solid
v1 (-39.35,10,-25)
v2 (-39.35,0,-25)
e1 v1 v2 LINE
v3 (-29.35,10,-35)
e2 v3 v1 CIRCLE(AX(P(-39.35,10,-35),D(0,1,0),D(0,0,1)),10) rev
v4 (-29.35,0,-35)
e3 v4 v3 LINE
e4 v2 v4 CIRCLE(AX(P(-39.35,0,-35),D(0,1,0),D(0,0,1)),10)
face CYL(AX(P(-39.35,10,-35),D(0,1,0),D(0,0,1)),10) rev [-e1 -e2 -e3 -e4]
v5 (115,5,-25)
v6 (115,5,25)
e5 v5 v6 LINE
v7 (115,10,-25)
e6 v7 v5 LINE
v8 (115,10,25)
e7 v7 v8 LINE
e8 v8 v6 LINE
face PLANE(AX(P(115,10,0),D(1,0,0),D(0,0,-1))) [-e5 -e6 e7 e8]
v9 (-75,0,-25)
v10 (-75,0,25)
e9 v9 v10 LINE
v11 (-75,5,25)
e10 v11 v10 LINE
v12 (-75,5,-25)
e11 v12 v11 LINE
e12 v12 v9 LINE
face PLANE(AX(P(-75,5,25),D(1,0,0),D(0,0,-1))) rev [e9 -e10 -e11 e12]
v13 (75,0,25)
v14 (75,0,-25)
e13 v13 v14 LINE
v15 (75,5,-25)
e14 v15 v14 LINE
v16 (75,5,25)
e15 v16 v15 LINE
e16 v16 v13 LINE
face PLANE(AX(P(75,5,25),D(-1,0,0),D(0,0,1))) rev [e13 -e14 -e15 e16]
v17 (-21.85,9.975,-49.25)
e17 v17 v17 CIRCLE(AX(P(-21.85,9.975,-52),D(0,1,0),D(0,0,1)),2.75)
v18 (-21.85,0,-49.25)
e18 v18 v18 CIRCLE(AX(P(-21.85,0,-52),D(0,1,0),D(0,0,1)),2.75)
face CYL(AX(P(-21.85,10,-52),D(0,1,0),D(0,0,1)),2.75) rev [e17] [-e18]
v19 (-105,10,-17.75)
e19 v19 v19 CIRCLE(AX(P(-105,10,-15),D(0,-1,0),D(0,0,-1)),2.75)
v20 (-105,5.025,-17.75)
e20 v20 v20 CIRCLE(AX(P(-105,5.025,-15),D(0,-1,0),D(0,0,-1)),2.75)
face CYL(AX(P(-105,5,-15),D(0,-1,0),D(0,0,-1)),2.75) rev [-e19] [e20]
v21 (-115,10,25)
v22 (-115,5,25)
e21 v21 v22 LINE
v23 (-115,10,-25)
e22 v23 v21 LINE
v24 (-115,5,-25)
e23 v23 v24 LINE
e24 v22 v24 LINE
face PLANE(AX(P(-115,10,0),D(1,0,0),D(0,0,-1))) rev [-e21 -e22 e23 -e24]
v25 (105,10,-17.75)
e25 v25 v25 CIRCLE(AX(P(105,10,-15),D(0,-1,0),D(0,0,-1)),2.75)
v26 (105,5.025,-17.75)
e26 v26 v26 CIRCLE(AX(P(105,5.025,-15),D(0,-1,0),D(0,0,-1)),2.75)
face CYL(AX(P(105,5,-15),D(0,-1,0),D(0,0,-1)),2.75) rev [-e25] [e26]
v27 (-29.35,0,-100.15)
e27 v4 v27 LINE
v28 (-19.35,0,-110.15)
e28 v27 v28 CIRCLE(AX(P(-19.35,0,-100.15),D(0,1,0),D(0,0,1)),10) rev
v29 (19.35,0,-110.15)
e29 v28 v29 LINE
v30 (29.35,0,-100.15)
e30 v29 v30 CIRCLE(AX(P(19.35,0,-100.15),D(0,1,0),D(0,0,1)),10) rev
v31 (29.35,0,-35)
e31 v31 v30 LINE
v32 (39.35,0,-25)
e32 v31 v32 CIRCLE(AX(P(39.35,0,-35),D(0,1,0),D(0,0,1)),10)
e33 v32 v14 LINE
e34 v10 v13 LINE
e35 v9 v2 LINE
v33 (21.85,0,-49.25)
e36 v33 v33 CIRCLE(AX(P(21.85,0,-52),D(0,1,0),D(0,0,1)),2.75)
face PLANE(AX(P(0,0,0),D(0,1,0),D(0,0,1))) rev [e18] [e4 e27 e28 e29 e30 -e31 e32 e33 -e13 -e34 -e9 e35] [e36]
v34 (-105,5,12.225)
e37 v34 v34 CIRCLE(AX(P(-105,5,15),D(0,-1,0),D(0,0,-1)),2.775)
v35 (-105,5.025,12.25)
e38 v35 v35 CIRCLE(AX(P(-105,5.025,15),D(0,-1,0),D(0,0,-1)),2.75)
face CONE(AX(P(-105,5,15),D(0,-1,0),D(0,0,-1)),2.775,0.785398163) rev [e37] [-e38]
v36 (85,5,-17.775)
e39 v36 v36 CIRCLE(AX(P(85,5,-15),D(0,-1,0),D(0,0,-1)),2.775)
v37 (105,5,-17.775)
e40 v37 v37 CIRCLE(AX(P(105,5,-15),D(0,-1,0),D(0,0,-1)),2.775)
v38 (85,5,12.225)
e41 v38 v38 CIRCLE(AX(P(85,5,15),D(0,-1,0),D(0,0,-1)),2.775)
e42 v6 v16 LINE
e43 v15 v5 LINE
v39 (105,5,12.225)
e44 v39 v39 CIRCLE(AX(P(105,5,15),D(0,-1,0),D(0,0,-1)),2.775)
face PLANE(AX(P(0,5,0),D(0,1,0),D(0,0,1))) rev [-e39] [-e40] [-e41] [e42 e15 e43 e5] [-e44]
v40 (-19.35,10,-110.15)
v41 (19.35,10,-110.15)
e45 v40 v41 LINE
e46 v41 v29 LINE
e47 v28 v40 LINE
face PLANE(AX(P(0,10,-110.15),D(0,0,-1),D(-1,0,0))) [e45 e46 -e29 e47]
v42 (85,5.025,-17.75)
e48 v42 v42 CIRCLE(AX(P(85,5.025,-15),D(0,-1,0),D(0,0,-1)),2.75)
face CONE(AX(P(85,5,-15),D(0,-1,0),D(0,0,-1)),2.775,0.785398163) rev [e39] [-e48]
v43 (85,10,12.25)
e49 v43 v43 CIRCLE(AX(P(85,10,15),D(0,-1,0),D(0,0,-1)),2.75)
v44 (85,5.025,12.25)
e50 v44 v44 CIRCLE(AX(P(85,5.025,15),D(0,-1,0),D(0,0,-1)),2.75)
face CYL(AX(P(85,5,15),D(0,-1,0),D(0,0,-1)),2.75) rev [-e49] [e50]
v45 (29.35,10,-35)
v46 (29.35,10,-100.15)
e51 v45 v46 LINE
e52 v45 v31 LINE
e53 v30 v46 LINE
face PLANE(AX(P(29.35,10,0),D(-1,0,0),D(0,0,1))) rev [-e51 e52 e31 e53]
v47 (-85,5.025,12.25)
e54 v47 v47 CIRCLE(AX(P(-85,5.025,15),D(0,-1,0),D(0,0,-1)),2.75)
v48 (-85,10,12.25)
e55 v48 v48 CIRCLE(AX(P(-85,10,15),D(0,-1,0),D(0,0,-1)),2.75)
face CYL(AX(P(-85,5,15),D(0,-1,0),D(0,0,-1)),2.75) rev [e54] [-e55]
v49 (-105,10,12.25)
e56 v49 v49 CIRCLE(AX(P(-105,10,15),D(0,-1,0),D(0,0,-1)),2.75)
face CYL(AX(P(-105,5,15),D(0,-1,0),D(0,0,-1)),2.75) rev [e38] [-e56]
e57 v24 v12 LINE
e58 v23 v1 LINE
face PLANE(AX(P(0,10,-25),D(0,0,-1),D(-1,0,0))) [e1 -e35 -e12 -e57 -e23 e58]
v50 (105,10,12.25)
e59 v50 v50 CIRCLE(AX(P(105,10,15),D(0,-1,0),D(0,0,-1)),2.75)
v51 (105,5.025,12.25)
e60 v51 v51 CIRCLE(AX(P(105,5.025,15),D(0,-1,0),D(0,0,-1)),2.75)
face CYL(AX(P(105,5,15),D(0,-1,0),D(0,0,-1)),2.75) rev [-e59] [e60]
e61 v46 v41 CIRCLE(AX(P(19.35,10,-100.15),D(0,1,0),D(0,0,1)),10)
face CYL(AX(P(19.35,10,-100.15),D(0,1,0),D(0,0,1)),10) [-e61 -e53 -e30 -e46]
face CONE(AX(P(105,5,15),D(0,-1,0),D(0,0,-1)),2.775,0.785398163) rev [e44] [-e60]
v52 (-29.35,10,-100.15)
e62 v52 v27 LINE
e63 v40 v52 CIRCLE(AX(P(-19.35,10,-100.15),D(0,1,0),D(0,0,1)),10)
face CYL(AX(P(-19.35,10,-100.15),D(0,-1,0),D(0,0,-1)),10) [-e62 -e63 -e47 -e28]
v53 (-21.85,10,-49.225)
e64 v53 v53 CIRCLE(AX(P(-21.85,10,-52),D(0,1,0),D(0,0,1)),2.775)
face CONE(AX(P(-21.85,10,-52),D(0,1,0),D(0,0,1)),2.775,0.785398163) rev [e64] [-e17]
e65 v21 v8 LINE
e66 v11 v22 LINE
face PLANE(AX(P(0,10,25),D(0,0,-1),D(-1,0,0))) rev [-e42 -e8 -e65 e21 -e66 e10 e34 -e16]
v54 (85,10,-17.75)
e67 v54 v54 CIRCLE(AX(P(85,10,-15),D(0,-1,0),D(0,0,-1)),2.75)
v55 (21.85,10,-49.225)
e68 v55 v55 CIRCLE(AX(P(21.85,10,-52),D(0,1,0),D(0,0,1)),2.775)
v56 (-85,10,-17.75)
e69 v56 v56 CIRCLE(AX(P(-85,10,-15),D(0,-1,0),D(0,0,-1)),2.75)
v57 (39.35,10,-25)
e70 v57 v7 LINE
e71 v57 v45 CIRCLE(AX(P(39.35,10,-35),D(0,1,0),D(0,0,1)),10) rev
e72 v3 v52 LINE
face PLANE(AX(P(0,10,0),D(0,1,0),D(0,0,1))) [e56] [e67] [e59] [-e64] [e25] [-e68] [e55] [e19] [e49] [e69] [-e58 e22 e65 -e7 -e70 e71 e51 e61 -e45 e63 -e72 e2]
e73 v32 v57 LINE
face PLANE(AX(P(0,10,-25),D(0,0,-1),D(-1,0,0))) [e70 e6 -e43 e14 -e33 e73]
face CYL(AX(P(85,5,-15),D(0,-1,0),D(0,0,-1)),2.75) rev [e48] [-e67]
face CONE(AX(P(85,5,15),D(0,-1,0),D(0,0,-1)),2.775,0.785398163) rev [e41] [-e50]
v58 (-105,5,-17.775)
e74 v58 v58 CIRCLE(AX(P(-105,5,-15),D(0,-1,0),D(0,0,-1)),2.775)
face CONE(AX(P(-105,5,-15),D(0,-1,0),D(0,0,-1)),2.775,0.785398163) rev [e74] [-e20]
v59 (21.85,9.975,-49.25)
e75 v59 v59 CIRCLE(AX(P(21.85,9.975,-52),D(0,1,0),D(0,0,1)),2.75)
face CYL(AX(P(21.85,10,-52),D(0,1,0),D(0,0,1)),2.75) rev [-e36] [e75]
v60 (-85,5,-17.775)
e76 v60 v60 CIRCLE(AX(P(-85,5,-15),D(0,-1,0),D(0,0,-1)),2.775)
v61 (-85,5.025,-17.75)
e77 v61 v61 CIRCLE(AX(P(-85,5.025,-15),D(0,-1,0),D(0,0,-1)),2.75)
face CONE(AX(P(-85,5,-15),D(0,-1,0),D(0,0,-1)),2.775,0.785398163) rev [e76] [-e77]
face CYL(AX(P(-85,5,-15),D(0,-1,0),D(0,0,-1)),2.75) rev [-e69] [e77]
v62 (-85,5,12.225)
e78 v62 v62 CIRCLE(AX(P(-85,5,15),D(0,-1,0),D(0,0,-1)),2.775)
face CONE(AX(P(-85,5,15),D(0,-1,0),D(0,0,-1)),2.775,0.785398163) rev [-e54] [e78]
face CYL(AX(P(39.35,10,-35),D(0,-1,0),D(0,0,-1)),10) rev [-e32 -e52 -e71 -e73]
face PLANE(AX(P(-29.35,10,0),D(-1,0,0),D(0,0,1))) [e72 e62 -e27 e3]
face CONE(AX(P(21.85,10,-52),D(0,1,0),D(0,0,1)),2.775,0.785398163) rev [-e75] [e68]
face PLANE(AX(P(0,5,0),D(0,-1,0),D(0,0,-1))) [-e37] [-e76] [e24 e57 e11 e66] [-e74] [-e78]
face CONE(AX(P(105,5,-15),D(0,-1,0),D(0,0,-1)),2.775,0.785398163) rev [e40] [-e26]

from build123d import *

# Parameters (mm, degrees)
SKETCH1_W                      = 58.7
SKETCH1_H                      = 85.15
SKETCH1_W_2                    = 230
SKETCH1_H_2                    = 50
BOSS_EXTRUDE1_DEPTH            = 10
M5_CLEARANCE_HOLE1_D           = 5.5
M5_CLEARANCE_HOLE1_CSINK_D     = 5.55
M5_CLEARANCE_HOLE1_CSINK_ANGLE = 90
SKETCH5_W                      = 40
SKETCH5_H                      = 50
CUT_EXTRUDE1_DEPTH             = 5
FILLET1_R                      = 10


# Read off the part's stored shape, not the designer's step: M5 Clearance Hole2
with BuildPart() as part:
    # Sketch1 → Boss-Extrude1 (new body)
    with BuildSketch(Plane(origin=(0, 0, 0), x_dir=(1, 0, 0), z_dir=(0, 1, 0))):
        with Locations((0, 67.575)):
            Rectangle(SKETCH1_W, SKETCH1_H)
        Rectangle(SKETCH1_W_2, SKETCH1_H_2)
    extrude(amount=BOSS_EXTRUDE1_DEPTH)

    # M5 Clearance Hole1 (through all)
    with Locations(Plane(origin=(0, 10, 0), x_dir=(1, 0, 0), z_dir=(0, 1, 0))):
        with Locations((-21.85, 52), (21.85, 52)):
            CounterSinkHole(M5_CLEARANCE_HOLE1_D / 2, M5_CLEARANCE_HOLE1_CSINK_D / 2, counter_sink_angle=M5_CLEARANCE_HOLE1_CSINK_ANGLE)

    # Sketch5 → Cut-Extrude1 (cut)
    with BuildSketch(Plane.XZ):
        with Locations((-95, 0)):
            Rectangle(SKETCH5_W, SKETCH5_H)
        with Locations((95, 0)):
            Rectangle(SKETCH5_W, SKETCH5_H)
    extrude(amount=-CUT_EXTRUDE1_DEPTH, mode=Mode.SUBTRACT)

    # M5 Clearance Hole2 outline → M5 Clearance Hole2 (revolve, cut)
    with BuildSketch(Plane(origin=(-85, 0, -15), x_dir=(1, 0, 0), z_dir=(0, 0, 1))):
        Polygon((2.75, 5.025), (2.75, 10), (0, 10), (0, 5), (2.775, 5), align=None)
    revolve(axis=Axis((-85, 0, -15), (0, 1, 0)), mode=Mode.SUBTRACT)

    # M5 Clearance Hole2 2 outline → M5 Clearance Hole2 2 (revolve, cut)
    with BuildSketch(Plane(origin=(-85, 0, 15), x_dir=(1, 0, 0), z_dir=(0, 0, 1))):
        Polygon((2.75, 5.025), (2.75, 10), (0, 10), (0, 5), (2.775, 5), align=None)
    revolve(axis=Axis((-85, 0, 15), (0, 1, 0)), mode=Mode.SUBTRACT)

    # M5 Clearance Hole2 3 outline → M5 Clearance Hole2 3 (revolve, cut)
    with BuildSketch(Plane(origin=(-105, 0, -15), x_dir=(1, 0, 0), z_dir=(0, 0, 1))):
        Polygon((2.75, 5.025), (2.75, 10), (0, 10), (0, 5), (2.775, 5), align=None)
    revolve(axis=Axis((-105, 0, -15), (0, 1, 0)), mode=Mode.SUBTRACT)

    # M5 Clearance Hole2 4 outline → M5 Clearance Hole2 4 (revolve, cut)
    with BuildSketch(Plane(origin=(-105, 0, 15), x_dir=(1, 0, 0), z_dir=(0, 0, 1))):
        Polygon((2.75, 5.025), (2.75, 10), (0, 10), (0, 5), (2.775, 5), align=None)
    revolve(axis=Axis((-105, 0, 15), (0, 1, 0)), mode=Mode.SUBTRACT)

    # M5 Clearance Hole2 5 outline → M5 Clearance Hole2 5 (revolve, cut)
    with BuildSketch(Plane(origin=(105, 0, -15), x_dir=(1, 0, 0), z_dir=(0, 0, 1))):
        Polygon((2.75, 5.025), (2.75, 10), (0, 10), (0, 5), (2.775, 5), align=None)
    revolve(axis=Axis((105, 0, -15), (0, 1, 0)), mode=Mode.SUBTRACT)

    # M5 Clearance Hole2 6 outline → M5 Clearance Hole2 6 (revolve, cut)
    with BuildSketch(Plane(origin=(105, 0, 15), x_dir=(1, 0, 0), z_dir=(0, 0, 1))):
        Polygon((2.75, 5.025), (2.75, 10), (0, 10), (0, 5), (2.775, 5), align=None)
    revolve(axis=Axis((105, 0, 15), (0, 1, 0)), mode=Mode.SUBTRACT)

    # M5 Clearance Hole2 7 outline → M5 Clearance Hole2 7 (revolve, cut)
    with BuildSketch(Plane(origin=(85, 0, -15), x_dir=(1, 0, 0), z_dir=(0, 0, 1))):
        Polygon((2.75, 5.025), (2.75, 10), (0, 10), (0, 5), (2.775, 5), align=None)
    revolve(axis=Axis((85, 0, -15), (0, 1, 0)), mode=Mode.SUBTRACT)

    # M5 Clearance Hole2 8 outline → M5 Clearance Hole2 8 (revolve, cut)
    with BuildSketch(Plane(origin=(85, 0, 15), x_dir=(1, 0, 0), z_dir=(0, 0, 1))):
        Polygon((2.75, 5.025), (2.75, 10), (0, 10), (0, 5), (2.775, 5), align=None)
    revolve(axis=Axis((85, 0, 15), (0, 1, 0)), mode=Mode.SUBTRACT)

    # Fillet1
    fillet1_edges = [part.edges().sort_by_distance(p)[0] for p in [
        (-29.35, 5, -110.15),
        (29.35, 5, -110.15),
        (29.35, 5, -25),
        (-29.35, 5, -25),
    ]]
    fillet(fillet1_edges, radius=FILLET1_R)


solid = part.part
